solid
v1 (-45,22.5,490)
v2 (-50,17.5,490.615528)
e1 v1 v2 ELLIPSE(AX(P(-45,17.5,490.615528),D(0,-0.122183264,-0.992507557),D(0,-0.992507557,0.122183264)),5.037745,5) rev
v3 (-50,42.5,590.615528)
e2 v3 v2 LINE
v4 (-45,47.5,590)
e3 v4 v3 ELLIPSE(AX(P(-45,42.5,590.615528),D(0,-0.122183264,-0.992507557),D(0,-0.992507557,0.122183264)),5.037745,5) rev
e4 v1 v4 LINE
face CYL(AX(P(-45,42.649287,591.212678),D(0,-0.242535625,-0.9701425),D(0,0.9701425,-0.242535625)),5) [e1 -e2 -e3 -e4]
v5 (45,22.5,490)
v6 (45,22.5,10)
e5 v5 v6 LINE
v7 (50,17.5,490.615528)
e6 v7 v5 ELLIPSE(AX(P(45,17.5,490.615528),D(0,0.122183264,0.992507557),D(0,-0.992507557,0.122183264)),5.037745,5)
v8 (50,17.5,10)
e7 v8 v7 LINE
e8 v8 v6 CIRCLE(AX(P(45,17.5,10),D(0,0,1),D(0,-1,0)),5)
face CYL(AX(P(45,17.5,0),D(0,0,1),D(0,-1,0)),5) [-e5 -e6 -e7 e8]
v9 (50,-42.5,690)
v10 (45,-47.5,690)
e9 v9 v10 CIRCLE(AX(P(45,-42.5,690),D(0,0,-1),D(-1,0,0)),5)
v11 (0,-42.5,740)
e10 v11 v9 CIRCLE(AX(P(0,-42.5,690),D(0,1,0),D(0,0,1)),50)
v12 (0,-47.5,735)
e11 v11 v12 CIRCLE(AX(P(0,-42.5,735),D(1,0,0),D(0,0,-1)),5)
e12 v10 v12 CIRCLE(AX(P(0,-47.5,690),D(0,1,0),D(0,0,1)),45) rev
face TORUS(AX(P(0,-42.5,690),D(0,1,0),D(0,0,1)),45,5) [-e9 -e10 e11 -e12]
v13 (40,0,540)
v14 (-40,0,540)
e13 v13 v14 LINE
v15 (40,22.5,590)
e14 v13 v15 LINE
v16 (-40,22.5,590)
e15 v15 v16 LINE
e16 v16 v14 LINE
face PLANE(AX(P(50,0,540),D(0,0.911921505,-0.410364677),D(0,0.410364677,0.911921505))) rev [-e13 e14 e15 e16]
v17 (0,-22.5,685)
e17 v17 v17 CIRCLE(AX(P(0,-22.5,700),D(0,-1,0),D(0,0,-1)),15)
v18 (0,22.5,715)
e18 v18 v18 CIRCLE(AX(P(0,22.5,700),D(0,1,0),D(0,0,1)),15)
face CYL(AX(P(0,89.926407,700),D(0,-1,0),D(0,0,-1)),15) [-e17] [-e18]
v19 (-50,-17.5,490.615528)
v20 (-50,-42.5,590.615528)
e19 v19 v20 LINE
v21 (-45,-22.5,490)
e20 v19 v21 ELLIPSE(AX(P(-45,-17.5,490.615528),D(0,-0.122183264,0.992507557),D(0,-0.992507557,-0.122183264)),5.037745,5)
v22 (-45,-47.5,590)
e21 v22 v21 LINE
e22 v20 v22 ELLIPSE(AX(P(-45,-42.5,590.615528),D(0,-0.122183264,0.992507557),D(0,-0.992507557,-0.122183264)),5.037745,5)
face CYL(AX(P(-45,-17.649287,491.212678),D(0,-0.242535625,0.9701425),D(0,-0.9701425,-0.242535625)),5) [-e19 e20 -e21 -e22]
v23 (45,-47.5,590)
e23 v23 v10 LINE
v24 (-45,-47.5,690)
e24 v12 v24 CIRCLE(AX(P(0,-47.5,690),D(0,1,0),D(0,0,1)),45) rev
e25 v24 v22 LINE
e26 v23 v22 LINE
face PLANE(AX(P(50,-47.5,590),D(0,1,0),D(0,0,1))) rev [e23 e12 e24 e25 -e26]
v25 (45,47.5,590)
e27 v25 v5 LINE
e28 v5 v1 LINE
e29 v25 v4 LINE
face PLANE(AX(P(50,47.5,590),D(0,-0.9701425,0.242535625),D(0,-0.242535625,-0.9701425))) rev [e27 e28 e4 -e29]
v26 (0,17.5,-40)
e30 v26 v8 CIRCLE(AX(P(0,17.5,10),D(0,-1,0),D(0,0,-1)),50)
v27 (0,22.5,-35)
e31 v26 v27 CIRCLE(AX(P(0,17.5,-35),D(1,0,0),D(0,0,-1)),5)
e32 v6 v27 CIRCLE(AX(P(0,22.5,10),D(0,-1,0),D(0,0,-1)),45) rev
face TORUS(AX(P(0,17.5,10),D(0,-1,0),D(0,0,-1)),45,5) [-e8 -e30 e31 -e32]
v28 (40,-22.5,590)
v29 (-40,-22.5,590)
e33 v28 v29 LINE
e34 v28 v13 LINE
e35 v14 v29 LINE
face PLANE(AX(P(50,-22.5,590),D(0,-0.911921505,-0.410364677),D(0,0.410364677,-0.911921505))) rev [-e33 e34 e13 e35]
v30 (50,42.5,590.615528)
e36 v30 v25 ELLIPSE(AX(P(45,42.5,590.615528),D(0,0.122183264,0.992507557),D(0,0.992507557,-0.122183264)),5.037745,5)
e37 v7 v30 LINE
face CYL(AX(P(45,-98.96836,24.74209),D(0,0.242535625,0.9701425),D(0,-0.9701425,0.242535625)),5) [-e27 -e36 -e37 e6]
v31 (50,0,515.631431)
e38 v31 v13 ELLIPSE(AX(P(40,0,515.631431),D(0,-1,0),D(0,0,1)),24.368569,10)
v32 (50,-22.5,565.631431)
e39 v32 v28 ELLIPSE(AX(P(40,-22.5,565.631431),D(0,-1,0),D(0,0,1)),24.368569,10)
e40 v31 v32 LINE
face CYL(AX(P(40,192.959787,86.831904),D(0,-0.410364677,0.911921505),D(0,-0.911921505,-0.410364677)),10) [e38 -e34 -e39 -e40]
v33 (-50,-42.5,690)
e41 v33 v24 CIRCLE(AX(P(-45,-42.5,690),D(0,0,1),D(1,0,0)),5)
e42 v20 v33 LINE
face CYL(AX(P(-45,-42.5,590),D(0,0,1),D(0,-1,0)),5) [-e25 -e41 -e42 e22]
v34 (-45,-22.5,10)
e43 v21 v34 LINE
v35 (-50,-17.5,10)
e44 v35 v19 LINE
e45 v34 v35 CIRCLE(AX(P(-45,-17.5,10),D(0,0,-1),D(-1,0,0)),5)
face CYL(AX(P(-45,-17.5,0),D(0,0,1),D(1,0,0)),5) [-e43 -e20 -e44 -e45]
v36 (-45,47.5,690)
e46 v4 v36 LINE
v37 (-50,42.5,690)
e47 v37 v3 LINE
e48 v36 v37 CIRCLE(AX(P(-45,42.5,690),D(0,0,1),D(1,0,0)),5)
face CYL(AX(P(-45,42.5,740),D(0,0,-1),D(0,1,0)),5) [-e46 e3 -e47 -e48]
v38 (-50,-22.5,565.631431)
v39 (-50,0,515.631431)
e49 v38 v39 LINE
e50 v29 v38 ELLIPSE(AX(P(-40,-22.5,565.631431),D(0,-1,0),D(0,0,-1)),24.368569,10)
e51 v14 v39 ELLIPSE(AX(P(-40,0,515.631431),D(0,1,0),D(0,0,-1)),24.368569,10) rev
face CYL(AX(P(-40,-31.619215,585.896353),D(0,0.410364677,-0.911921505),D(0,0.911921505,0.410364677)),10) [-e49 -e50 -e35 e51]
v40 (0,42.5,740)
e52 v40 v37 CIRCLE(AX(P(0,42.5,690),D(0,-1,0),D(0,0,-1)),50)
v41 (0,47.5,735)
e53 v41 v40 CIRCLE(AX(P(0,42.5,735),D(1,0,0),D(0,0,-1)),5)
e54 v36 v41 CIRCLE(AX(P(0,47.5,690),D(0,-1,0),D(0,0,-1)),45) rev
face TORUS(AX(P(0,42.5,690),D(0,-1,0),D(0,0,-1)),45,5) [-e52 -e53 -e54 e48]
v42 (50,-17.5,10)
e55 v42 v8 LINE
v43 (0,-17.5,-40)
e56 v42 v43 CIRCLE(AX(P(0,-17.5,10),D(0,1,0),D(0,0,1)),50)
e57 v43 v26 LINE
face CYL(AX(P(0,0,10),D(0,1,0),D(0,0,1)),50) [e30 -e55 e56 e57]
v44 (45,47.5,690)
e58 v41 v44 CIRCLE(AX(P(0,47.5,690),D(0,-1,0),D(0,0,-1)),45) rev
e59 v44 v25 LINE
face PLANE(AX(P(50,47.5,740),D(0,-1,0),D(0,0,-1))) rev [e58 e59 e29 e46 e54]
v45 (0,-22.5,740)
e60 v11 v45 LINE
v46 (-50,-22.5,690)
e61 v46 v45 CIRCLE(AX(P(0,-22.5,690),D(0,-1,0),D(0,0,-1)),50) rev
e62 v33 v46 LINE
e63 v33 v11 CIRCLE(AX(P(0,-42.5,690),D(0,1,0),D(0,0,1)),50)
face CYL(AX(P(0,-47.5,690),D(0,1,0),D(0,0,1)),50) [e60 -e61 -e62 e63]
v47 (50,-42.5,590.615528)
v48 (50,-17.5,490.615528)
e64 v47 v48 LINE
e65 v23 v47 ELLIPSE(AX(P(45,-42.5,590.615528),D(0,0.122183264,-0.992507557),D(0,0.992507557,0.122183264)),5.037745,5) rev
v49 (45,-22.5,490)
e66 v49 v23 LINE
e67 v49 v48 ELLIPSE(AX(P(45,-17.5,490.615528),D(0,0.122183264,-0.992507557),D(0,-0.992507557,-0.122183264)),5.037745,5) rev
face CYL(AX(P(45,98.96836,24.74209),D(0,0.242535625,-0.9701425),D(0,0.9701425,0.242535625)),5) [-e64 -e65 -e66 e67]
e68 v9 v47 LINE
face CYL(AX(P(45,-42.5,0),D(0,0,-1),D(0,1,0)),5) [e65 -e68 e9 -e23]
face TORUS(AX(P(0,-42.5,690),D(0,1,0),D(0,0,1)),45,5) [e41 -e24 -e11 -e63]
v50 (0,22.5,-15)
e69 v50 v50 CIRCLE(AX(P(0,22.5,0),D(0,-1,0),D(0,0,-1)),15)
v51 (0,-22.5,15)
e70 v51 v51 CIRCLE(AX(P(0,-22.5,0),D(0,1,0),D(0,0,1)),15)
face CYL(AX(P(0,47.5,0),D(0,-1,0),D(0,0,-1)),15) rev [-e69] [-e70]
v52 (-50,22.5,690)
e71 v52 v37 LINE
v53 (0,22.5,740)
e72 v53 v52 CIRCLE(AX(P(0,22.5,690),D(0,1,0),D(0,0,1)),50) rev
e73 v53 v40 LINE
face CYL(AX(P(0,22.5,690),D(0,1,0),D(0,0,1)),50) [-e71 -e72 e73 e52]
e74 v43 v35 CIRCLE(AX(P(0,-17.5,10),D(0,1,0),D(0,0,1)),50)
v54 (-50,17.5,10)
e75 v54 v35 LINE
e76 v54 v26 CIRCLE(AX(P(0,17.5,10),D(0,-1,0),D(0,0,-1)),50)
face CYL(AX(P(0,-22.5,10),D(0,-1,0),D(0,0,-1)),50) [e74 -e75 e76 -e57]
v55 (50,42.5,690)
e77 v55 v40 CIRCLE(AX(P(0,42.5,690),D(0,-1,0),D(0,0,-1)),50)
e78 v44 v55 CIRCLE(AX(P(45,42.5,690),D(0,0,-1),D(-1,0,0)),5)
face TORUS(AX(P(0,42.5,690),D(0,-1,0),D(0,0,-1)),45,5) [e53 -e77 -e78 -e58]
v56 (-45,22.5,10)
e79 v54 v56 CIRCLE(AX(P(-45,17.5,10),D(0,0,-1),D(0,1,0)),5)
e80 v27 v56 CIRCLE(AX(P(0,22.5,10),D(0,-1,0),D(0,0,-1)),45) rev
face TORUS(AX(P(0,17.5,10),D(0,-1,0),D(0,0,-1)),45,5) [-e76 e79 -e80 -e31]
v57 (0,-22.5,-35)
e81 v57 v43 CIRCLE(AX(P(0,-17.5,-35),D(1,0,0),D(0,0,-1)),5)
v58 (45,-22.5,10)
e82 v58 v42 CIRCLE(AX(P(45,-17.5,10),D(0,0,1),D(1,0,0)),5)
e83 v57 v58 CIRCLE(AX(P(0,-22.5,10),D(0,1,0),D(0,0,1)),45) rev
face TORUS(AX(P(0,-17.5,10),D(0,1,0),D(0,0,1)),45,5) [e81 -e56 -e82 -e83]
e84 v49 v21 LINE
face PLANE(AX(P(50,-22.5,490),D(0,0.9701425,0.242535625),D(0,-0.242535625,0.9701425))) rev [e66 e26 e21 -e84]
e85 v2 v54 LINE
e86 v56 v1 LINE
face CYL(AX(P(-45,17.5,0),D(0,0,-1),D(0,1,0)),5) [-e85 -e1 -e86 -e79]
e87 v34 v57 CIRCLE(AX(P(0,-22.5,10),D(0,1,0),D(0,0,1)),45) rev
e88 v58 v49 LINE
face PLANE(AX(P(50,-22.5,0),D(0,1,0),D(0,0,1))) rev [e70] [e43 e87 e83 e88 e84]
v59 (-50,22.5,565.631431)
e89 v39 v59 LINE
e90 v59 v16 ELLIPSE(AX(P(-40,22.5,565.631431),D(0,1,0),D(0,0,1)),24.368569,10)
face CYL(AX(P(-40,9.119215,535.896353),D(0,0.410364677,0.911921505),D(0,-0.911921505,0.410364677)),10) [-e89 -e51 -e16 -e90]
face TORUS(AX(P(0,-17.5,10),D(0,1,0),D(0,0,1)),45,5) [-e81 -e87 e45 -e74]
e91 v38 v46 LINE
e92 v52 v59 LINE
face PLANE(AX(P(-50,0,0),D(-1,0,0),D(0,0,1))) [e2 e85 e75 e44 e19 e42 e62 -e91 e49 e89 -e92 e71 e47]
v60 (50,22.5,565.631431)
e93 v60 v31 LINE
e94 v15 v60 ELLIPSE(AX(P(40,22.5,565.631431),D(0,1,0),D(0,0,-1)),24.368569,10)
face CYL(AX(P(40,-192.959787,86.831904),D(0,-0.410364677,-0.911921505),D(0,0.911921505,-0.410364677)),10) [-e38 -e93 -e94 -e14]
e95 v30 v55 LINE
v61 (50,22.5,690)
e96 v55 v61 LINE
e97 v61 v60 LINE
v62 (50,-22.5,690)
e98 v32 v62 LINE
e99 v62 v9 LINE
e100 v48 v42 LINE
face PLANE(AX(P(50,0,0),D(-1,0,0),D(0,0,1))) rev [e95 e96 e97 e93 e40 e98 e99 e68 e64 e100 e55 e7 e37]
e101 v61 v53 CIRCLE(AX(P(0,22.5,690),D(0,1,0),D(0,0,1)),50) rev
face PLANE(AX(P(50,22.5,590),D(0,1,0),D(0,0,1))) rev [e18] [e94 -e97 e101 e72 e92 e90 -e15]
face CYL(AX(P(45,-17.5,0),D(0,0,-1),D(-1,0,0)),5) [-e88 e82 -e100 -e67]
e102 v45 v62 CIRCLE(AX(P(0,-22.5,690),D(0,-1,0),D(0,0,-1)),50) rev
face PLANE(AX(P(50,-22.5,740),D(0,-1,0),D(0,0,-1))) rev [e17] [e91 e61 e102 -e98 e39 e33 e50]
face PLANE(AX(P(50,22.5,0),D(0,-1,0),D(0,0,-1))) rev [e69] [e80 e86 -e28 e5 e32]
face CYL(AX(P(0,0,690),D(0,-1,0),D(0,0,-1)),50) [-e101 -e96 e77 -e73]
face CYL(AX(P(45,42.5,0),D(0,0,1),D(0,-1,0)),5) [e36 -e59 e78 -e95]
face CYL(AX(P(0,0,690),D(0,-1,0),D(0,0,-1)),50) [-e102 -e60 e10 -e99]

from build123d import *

# Parameters (mm, degrees)
BOSS_EXTRUDE1_DEPTH     = 50
CUT_EXTRUDE1_DEPTH      = 745.983221288
CUT_EXTRUDE1_DEPTH_BACK = 745.983221288
SKETCH3_R               = 15
SKETCH4_R               = 15
BOSS_EXTRUDE2_DEPTH     = 95
FILLET1_R               = 50
FILLET2_R               = 10
FILLET3_R               = 50
FILLET4_R               = 5


with BuildPart() as part:
    # Sketch2 → Boss-Extrude1 (new, symmetric)
    with BuildSketch(Plane(origin=(0, 0, 0), x_dir=(0, 0, -1), z_dir=(1, 0, 0))):
        Polygon((0, -22.5), (40, -22.5), (40, 22.5), (0, 22.5), (-490, 22.5), (-590, 47.5), (-740, 47.5), (-740, 22.5), (-590, 22.5), (-540, 0), (-590, -22.5), (-740, -22.5), (-740, -47.5), (-590, -47.5), (-490, -22.5), align=None)
    extrude(amount=BOSS_EXTRUDE1_DEPTH, both=True)

    # Sketch3 → Cut-Extrude1 (cut, two sides: drawn at the far end of the back side and taken through both)
    with BuildSketch(Plane.XZ.offset(22.5).offset(-CUT_EXTRUDE1_DEPTH_BACK)):
        with Locations(Location((0, 0, 0), (0, 0, 270))):
            Circle(SKETCH3_R)
    extrude(amount=CUT_EXTRUDE1_DEPTH + CUT_EXTRUDE1_DEPTH_BACK, mode=Mode.SUBTRACT)

    # Sketch4 → Boss-Extrude2 (add)
    with BuildSketch(Plane.XZ.offset(47.5)):
        with Locations(Location((0, 700, 0), (0, 0, 270))):
            Circle(SKETCH4_R)
    extrude(amount=-BOSS_EXTRUDE2_DEPTH)

    # Fillet1
    fillet1_edges = [part.edges().sort_by_distance(p)[0] for p in [
        (50, 0, -40),
        (-50, 0, -40),
    ]]
    fillet(fillet1_edges, radius=FILLET1_R - 0.0001)  # a hair under: the kernel refuses the full size

    # Fillet2
    fillet2_edges = [part.edges().sort_by_distance(p)[0] for p in [
        (-50, -11.25, 565),
        (-50, 11.25, 565),
        (50, 11.25, 565),
        (50, -11.25, 565),
    ]]
    fillet(fillet2_edges, radius=FILLET2_R)

    # Fillet3
    fillet3_edges = [part.edges().sort_by_distance(p)[0] for p in [
        (-50, -35, 740),
        (-50, 35, 740),
        (50, 35, 740),
        (50, -35, 740),
    ]]
    fillet(fillet3_edges, radius=FILLET3_R - 0.0001)  # a hair under: the kernel refuses the full size

    # Fillet4
    fillet4_edges = [part.edges().sort_by_distance(p)[0] for p in [
        (-50, -47.5, 640.00005),
        (50, -47.5, 640.00005),
        (35.355368349, -47.5, 725.355368349),
        (-35.355368349, -47.5, 725.355368349),
        (35.355368349, 47.5, 725.355368349),
        (-35.355368349, 47.5, 725.355368349),
        (-50, -35, 540),
        (-50, 47.5, 640.00005),
        (-50, 35, 540),
        (-50, -22.5, 249.99995),
        (50, 35, 540),
        (50, 47.5, 640.00005),
        (50, -22.5, 249.99995),
        (50, 22.5, 249.99995),
        (50, -35, 540),
        (-50, 22.5, 249.99995),
        (-35.355368349, 22.5, -25.355368349),
        (35.355368349, 22.5, -25.355368349),
        (-35.355368349, -22.5, -25.355368349),
        (35.355368349, -22.5, -25.355368349),
    ]]
    fillet(fillet4_edges, radius=FILLET4_R)


solid = part.part
